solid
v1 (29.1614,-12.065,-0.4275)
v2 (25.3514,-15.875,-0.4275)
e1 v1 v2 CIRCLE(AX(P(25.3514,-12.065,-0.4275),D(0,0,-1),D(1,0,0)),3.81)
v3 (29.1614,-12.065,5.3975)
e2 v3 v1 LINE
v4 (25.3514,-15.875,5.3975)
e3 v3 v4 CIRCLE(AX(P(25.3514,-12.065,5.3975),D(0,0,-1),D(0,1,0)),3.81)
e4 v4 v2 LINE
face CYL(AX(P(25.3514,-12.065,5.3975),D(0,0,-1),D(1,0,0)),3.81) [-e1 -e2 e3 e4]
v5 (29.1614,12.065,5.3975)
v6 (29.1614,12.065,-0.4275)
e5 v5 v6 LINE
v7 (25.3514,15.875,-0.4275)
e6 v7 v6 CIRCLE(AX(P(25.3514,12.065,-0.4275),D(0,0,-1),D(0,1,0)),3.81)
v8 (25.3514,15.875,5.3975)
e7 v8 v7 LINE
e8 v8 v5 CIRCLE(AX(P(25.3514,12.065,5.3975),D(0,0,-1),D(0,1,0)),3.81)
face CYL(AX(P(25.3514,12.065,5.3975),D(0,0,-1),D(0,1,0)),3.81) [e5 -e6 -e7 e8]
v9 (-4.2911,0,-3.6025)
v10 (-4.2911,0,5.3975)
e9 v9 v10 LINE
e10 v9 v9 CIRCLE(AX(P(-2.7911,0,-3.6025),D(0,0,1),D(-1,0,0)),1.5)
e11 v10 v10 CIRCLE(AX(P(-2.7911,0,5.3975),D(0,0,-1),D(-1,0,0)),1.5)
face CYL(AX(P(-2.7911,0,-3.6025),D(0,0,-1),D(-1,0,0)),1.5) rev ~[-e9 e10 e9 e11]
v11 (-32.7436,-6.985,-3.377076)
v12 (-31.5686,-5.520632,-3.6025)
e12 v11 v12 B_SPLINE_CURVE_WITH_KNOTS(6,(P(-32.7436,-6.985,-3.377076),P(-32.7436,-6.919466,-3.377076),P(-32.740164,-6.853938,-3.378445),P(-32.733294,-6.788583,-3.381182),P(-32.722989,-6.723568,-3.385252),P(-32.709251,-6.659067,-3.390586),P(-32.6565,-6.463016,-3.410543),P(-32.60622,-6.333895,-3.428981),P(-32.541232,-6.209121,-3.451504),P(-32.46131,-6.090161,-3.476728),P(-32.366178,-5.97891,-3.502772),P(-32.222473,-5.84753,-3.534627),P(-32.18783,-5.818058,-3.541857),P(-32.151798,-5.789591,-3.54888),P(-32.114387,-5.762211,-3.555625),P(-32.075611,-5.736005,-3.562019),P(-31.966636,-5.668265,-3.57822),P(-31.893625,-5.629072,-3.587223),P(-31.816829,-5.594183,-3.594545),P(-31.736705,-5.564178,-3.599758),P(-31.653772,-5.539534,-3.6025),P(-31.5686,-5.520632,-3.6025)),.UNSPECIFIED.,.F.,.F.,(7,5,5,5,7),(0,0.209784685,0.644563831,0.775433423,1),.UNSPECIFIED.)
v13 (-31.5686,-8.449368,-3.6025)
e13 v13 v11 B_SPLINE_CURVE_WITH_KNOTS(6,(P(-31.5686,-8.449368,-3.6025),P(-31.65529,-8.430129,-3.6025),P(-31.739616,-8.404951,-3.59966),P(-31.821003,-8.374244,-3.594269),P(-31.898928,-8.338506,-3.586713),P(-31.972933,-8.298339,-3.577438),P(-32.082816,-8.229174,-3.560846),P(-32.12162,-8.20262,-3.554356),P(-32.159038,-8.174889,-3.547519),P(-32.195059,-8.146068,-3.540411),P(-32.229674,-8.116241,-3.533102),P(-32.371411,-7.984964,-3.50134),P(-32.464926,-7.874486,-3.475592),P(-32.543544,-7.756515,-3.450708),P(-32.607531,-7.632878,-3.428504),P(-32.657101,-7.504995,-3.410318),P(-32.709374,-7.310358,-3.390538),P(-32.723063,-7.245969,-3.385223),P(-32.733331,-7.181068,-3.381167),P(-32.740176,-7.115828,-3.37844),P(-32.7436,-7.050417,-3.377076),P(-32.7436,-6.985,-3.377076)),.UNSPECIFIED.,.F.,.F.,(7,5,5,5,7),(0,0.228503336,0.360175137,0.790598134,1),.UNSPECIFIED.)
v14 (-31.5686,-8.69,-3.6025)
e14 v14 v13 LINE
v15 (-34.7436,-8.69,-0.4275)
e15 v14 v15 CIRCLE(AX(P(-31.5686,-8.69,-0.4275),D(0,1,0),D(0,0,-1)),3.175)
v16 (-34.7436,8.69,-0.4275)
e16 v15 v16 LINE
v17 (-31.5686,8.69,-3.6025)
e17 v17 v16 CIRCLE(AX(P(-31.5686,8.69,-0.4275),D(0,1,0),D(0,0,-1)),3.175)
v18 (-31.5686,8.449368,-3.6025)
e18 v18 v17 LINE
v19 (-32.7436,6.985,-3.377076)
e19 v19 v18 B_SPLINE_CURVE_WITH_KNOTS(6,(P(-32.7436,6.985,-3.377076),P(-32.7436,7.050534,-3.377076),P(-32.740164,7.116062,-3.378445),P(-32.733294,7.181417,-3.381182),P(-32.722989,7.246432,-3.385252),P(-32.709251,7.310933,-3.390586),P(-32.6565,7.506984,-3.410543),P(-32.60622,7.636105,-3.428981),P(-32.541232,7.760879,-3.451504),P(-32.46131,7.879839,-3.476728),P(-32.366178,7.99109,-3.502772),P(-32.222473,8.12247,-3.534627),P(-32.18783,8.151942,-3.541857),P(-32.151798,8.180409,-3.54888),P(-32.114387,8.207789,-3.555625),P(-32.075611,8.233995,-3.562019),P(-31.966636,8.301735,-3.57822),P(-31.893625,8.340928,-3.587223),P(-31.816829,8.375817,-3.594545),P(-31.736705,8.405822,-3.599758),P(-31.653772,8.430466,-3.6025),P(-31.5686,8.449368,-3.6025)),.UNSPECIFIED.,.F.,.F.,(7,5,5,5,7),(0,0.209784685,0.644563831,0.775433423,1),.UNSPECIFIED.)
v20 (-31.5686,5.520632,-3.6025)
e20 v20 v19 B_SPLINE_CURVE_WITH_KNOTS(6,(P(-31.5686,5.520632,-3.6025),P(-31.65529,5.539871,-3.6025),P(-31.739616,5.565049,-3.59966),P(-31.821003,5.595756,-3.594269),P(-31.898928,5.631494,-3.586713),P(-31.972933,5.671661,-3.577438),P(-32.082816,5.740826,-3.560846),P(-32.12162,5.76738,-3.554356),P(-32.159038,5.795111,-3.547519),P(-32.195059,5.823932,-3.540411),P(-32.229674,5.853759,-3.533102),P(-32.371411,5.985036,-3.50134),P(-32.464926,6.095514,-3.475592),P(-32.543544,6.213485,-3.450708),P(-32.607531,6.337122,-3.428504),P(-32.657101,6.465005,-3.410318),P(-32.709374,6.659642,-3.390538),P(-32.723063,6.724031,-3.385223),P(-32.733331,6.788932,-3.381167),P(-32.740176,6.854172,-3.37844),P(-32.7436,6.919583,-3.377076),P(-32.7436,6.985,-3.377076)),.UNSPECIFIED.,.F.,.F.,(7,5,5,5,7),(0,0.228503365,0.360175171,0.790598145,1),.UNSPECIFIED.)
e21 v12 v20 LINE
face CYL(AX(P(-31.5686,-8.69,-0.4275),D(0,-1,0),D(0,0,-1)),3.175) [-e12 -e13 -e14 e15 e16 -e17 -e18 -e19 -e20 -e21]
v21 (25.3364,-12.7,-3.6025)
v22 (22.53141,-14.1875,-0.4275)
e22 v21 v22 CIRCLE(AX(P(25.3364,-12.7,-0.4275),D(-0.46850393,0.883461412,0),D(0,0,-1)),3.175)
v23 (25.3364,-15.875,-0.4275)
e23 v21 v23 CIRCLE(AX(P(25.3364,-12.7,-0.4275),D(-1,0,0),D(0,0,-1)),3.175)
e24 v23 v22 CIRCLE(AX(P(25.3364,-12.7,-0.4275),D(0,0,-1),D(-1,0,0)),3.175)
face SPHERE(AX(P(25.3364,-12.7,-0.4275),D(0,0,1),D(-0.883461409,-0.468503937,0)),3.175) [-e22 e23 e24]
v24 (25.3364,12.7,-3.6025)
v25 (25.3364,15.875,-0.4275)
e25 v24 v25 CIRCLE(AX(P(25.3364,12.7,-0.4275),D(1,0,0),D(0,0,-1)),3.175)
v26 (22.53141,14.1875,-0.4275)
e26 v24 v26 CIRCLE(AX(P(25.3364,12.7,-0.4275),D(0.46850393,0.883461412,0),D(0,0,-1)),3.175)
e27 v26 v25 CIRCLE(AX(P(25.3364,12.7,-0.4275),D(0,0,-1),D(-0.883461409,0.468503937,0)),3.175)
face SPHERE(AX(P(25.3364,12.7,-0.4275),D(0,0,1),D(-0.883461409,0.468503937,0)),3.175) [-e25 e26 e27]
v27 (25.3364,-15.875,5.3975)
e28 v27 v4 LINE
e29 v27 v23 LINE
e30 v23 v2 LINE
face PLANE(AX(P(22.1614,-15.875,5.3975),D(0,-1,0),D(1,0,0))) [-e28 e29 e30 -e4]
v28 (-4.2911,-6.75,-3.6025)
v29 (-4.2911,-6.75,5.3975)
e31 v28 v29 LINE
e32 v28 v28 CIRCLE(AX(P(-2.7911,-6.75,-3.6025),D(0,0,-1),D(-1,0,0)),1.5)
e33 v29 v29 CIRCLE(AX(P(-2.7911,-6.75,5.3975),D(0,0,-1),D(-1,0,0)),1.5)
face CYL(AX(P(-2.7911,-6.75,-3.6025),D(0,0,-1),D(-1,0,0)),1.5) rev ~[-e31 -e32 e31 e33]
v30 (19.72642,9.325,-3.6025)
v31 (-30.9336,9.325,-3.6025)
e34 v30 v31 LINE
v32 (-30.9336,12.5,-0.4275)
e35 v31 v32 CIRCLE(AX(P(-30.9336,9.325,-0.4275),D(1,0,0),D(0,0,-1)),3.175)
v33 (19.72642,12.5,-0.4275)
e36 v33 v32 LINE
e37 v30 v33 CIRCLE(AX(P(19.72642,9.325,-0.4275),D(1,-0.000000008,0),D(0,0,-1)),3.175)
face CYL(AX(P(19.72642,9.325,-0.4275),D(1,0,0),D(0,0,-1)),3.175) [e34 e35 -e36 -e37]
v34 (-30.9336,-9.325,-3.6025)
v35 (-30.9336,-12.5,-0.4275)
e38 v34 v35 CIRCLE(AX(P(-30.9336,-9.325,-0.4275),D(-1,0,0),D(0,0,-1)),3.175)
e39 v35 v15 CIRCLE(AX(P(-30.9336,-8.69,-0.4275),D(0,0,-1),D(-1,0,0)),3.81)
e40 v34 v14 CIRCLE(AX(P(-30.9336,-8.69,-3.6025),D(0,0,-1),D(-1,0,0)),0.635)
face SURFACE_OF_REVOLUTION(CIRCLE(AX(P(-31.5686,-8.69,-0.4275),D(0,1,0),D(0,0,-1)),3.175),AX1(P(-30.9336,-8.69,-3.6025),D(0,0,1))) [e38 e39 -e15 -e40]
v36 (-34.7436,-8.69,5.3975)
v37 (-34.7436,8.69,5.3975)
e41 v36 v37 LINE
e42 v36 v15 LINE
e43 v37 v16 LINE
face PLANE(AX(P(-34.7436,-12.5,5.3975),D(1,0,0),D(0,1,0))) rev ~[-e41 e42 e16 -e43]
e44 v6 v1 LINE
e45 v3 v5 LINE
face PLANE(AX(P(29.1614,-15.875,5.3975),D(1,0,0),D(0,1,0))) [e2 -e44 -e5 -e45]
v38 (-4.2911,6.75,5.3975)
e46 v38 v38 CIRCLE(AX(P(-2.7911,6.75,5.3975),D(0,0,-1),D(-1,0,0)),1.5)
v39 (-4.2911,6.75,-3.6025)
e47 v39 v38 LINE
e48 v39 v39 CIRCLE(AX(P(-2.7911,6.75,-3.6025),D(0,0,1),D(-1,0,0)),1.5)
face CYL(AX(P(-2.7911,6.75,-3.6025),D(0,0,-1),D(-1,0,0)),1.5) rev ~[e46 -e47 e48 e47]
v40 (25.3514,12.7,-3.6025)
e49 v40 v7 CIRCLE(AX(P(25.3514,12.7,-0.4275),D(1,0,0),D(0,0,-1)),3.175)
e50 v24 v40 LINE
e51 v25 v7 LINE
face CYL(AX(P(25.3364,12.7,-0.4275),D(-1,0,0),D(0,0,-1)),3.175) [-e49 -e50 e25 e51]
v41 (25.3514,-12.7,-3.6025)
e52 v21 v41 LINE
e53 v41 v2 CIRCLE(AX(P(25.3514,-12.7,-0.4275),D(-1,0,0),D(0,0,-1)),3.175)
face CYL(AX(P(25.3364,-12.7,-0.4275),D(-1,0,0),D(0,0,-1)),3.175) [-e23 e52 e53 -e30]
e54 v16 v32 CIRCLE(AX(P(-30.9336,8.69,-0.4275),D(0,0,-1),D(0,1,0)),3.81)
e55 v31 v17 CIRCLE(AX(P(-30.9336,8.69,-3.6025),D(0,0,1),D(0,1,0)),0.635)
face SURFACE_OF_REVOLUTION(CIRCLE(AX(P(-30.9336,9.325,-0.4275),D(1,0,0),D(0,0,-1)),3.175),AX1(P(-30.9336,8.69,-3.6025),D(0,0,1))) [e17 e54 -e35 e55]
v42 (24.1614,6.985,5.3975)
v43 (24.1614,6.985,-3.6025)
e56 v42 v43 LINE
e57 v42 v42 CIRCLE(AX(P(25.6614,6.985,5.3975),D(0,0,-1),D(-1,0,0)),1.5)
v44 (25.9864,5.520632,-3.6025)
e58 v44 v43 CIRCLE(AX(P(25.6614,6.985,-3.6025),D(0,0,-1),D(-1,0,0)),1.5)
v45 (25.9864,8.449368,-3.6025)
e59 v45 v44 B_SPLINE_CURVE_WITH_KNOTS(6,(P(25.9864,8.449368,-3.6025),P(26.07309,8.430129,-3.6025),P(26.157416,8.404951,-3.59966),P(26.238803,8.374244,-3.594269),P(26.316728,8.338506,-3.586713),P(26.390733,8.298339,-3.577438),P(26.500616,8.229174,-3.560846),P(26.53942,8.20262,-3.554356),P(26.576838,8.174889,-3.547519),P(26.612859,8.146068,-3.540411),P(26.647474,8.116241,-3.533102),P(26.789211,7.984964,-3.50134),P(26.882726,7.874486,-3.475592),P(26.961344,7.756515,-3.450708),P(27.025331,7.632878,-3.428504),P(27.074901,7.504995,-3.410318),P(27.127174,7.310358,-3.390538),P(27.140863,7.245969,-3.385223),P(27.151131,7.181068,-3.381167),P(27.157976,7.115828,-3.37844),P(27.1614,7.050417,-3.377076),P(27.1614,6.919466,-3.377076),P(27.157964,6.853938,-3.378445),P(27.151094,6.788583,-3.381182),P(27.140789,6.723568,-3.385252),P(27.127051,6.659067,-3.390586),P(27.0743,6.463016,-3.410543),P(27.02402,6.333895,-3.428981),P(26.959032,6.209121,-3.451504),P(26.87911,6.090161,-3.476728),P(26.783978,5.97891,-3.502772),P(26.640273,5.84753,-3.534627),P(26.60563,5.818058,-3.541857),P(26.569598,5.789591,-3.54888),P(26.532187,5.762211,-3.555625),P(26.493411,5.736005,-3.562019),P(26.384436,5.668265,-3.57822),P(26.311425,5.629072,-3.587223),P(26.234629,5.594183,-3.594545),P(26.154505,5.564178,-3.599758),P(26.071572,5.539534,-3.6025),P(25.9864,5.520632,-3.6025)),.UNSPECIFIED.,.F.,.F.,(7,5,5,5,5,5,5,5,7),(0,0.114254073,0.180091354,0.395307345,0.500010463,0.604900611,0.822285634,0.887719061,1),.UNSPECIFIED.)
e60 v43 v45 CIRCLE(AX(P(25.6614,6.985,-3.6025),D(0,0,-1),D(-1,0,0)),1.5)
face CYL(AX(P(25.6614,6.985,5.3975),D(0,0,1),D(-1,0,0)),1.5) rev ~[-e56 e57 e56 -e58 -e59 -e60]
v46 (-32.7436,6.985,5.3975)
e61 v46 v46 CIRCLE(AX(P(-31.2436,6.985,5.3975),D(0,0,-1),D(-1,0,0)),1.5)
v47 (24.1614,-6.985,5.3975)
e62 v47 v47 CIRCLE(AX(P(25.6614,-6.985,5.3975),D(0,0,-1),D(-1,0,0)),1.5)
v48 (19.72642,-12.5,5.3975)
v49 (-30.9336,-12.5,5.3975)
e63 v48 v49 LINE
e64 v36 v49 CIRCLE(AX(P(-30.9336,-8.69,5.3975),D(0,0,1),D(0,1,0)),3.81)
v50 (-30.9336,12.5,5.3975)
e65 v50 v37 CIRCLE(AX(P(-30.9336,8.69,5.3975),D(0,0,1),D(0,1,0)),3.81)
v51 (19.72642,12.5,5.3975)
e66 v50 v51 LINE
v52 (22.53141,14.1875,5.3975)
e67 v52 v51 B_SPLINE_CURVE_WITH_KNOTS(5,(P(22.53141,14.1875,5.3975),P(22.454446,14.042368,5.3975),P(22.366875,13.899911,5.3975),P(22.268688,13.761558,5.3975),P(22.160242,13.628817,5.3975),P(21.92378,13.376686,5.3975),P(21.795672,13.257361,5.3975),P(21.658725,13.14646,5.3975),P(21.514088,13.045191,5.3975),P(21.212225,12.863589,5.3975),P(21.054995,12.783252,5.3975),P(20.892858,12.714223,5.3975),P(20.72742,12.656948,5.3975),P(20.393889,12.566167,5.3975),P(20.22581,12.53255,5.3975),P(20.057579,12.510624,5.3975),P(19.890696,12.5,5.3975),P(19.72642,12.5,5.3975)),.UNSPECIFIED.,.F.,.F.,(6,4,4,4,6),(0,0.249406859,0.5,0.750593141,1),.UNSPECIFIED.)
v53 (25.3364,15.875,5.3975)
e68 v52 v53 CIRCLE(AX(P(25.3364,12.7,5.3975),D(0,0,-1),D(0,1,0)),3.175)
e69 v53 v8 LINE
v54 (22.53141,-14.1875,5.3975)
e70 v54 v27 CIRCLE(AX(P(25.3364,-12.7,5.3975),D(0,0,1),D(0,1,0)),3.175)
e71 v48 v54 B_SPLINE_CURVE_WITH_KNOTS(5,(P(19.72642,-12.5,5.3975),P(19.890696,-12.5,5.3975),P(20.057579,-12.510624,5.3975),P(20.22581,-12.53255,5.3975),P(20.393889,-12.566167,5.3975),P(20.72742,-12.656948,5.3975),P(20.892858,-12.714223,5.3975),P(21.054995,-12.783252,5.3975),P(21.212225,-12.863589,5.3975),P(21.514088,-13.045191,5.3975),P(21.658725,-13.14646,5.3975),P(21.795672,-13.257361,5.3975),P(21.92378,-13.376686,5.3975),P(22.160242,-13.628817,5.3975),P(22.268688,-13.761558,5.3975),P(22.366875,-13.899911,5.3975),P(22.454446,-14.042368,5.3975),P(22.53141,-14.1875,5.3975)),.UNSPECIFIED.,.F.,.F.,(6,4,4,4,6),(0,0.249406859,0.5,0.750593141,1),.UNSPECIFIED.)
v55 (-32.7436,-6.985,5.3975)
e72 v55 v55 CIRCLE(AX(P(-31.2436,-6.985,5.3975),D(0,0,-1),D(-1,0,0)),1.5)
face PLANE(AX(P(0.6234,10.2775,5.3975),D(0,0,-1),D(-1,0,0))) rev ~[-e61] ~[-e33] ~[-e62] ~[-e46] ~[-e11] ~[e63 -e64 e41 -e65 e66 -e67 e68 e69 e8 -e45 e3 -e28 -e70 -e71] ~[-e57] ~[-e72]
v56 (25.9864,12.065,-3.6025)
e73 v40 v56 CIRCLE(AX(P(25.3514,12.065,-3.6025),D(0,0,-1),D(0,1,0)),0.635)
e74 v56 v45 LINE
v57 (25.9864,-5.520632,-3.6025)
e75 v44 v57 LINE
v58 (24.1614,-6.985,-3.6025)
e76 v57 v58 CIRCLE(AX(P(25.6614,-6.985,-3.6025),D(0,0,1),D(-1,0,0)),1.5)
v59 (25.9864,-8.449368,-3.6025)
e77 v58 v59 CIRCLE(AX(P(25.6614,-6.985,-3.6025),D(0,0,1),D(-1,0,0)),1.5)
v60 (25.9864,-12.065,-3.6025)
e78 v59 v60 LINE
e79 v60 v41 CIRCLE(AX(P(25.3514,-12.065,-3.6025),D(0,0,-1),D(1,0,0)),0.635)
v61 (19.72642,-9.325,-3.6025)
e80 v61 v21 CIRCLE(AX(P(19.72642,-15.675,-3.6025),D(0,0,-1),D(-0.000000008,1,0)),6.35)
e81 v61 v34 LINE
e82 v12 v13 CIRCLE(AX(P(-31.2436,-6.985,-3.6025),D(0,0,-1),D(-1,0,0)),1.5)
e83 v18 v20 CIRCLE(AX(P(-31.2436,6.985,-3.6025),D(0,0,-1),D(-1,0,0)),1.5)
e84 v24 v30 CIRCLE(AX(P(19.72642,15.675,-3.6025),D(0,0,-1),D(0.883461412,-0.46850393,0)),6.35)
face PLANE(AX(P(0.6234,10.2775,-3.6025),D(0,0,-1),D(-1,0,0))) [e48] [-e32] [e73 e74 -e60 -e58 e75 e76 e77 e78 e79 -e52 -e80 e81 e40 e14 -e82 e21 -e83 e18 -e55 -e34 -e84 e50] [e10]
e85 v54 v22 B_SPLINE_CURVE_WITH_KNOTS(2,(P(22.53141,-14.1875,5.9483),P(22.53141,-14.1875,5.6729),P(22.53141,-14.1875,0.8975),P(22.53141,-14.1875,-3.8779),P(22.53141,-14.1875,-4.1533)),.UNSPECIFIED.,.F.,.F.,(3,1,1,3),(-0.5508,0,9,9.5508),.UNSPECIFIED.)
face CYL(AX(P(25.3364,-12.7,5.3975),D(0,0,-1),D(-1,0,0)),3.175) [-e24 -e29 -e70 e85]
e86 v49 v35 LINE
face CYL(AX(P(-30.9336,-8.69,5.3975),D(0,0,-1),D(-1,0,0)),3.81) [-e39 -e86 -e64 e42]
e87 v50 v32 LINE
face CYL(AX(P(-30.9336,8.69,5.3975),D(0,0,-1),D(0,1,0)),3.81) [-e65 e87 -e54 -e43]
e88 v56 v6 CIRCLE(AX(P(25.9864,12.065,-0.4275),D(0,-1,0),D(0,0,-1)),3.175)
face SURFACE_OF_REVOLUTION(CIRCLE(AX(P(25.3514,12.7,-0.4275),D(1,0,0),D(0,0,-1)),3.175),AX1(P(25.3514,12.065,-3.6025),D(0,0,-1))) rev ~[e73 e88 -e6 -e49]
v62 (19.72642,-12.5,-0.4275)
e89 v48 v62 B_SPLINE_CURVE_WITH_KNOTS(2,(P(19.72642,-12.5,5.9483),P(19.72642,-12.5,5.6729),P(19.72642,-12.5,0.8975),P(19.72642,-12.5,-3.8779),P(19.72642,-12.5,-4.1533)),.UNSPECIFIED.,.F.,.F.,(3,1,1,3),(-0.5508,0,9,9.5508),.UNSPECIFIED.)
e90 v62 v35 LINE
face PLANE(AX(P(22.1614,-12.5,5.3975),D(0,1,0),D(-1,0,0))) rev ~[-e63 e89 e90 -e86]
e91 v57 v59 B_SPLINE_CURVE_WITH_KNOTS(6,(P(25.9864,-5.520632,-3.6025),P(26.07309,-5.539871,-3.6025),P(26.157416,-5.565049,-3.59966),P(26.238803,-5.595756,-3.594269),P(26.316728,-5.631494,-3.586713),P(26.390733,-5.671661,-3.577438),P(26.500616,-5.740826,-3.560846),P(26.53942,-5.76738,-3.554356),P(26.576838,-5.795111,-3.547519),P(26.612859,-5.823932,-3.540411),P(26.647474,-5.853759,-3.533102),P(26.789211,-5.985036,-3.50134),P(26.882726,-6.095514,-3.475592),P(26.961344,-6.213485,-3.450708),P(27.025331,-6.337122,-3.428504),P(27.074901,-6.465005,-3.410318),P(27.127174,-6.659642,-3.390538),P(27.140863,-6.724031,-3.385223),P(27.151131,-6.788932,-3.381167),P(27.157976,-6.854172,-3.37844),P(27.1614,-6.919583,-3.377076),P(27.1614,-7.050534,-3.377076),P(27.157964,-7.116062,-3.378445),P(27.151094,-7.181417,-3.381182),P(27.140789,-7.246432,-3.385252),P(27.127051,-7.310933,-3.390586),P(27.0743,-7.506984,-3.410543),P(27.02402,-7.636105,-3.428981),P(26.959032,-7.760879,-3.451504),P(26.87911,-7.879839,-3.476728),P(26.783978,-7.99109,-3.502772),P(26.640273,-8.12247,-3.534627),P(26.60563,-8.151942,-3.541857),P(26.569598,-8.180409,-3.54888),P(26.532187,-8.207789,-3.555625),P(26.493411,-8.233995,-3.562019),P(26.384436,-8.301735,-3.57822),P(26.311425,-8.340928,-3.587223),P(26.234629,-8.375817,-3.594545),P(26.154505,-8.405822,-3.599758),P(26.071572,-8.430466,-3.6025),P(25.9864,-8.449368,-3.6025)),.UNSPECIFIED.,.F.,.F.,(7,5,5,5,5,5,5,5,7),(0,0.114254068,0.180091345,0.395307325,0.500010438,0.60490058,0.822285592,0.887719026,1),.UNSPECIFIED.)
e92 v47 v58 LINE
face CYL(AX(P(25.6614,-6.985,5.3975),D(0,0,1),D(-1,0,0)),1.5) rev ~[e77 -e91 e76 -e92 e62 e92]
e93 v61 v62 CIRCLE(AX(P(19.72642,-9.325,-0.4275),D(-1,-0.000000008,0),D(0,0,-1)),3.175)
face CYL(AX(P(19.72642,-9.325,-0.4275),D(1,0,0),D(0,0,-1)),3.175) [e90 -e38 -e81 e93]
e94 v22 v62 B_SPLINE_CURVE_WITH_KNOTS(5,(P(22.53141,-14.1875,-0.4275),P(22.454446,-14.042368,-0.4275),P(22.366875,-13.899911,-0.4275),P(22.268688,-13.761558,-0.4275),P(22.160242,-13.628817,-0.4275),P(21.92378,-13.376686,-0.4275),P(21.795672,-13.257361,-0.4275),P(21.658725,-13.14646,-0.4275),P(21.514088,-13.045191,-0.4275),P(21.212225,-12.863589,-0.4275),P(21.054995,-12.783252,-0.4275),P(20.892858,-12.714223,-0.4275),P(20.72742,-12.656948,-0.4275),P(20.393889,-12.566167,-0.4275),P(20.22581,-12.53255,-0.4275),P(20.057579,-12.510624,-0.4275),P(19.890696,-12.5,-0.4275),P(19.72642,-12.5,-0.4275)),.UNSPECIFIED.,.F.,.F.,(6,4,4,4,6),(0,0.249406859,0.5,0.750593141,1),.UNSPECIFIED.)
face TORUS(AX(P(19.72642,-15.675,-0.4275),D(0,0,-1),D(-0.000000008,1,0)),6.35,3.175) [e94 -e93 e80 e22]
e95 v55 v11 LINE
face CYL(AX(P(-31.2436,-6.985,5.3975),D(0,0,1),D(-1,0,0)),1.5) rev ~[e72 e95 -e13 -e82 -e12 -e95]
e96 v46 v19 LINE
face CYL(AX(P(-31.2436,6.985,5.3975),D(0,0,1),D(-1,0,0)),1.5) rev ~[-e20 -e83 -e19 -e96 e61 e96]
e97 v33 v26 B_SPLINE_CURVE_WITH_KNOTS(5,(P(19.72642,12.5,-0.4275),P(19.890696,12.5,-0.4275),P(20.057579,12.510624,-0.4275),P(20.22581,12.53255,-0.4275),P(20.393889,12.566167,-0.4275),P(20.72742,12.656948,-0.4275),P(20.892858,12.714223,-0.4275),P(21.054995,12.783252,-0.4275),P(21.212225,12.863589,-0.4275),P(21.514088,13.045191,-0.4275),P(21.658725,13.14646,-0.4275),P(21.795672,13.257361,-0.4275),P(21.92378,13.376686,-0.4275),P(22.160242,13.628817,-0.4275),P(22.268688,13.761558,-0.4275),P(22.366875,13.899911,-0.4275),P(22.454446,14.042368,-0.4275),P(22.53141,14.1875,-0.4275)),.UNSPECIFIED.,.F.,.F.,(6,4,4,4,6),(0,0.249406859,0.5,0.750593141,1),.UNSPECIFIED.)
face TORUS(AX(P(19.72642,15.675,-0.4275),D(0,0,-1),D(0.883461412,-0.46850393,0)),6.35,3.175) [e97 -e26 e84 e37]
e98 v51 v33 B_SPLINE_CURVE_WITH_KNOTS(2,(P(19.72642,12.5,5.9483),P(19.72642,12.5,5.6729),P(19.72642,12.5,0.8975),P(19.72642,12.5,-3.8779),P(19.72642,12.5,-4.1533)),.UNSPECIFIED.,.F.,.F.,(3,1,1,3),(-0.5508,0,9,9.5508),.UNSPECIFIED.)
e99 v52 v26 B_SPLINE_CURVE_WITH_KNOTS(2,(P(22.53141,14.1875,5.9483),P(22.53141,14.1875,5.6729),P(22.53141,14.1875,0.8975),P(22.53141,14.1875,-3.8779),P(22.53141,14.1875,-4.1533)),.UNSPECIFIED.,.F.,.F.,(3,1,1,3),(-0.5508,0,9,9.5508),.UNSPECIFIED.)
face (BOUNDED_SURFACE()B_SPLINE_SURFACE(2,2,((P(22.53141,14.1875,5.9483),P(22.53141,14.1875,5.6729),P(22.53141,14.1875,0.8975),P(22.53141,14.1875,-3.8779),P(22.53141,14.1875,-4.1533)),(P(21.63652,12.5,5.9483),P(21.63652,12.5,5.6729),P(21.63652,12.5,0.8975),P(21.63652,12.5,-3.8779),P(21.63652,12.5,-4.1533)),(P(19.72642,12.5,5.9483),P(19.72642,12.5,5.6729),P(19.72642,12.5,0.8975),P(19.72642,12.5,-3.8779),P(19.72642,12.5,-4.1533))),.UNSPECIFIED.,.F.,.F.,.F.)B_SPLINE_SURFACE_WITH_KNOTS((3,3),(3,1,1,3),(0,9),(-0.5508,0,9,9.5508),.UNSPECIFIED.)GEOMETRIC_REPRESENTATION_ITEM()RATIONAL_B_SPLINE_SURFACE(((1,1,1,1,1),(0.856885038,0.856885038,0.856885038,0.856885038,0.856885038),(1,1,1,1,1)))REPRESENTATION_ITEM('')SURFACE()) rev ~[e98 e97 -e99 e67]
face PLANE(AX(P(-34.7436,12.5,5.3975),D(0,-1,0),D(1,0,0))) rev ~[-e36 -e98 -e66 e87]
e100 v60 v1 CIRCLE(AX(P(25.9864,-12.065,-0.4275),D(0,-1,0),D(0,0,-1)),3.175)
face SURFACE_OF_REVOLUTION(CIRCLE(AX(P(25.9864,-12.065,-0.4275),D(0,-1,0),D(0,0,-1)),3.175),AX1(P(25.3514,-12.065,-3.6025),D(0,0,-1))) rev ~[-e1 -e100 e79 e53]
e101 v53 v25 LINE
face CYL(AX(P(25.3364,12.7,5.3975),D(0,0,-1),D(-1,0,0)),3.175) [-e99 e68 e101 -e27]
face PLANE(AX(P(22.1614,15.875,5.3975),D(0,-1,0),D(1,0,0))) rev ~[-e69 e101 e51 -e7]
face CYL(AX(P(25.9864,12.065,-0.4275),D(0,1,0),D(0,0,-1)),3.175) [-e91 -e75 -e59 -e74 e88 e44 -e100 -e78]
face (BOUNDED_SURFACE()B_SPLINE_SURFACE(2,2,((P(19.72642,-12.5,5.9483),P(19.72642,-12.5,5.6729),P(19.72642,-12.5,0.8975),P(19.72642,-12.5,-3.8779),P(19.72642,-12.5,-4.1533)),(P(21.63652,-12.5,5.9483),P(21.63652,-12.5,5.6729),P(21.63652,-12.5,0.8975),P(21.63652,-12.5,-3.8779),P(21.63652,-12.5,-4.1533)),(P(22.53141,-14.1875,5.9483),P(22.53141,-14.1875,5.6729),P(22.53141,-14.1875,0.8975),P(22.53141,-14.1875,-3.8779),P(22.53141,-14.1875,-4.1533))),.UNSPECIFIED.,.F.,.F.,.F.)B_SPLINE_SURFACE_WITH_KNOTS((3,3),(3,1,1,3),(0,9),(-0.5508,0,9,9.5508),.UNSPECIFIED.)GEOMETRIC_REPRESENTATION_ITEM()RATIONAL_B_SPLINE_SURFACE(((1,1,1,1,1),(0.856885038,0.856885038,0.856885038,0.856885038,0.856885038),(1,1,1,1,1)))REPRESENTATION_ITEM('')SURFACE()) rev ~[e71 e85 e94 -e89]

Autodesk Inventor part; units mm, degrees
ref_plane "YZ Plane" through (0, 0, 0) normal (1, 0, 0) x (0, 1, 0)
ref_plane "XZ Plane" through (0, 0, 0) normal (0, 1, 0) x (-1, 0, 0)
ref_plane "XY Plane" through (0, 0, 0) normal (0, 0, 1) x (1, 0, 0)
sketch "Sketch1" plane through (0, 0, 0) normal (0, 0, 1) x (1, 0, 0)
  circle A0 centre (-10.2325, -6.35) radius 2
  circle A1 centre (-10.2325, 6.35) radius 2
  circle A2 centre (10.0875, 6.35) radius 2
  circle A3 centre (10.0875, -6.35) radius 2
  line L0 (-15.3125, 10.2775) -> (10.2325, 10.2775)
  line L1 (10.2325, 10.2775) -> (15.3125, 10.2775)
  line L2 (15.3125, 10.2775) -> (15.3125, -10.2775)
  line L3 (-15.3125, 10.2775) -> (-15.3125, -10.2775)
  line L4 (-15.3125, -10.2775) -> (15.3125, -10.2775)
  line L5 (0, -10.2775) -> (0, 10.2775)
  line L6 (-15.3125, 0) -> (0, 0)
  point P0 (0, 0)
  dimension "d1" = 5.08
extrude "Extrusion1" add sketch "Sketch1" along normal blind 3.81 contours A0 | A1 | A2 | A3 | L0 L5 L6 L3 | L0 L1 L2 L4 L5 | L6 L5 L4 L3
sketch "Sketch2" plane through (0, 0, 3.81) normal (0, 0, 1) x (1, 0, 0)
  line L0 (-15.3125, -10.2775) -> (15.3125, -10.2775) projected
  line L1 (15.3125, -10.2775) -> (15.3125, 10.2775) projected
  line L2 (15.3125, 10.2775) -> (-15.3125, 10.2775) projected
  line L3 (-15.3125, 10.2775) -> (-15.3125, -10.2775) projected
  point P0 (0, 0)
extrude "Extrusion2" add sketch "Sketch2" along normal blind 1.5875
sketch "Sketch3" plane through (0, 0, 5.3975) normal (0, 0, 1) x (1, 0, 0)
  circle A0 centre (-10.2325, -6.35) radius 2 projected
  circle A1 centre (10.0875, -6.35) radius 2 projected
  circle A2 centre (10.0875, 6.35) radius 2 projected
  circle A3 centre (-10.2325, 6.35) radius 2 projected
  line L0 (-15.3125, -10.2775) -> (15.3125, -10.2775) projected
  line L1 (10.0875, -10.2775) -> (10.0875, 10.2775)
  line L2 (15.3125, 10.2775) -> (-15.3125, 10.2775) projected
  line L3 (-10.2325, -10.2775) -> (-10.2325, 10.2775)
  line L4 (-10.2325, 10.2775) -> (10.0875, 10.2775)
  line L5 (10.0875, -10.2775) -> (-10.2325, -10.2775)
  line L6 (15.3125, -10.2775) -> (15.3125, 10.2775) projected
  point P0 (0, 0)
extrude "Extrusion3" add sketch "Sketch3" along normal blind 8.9916 contours A0 L3 | A0 L3 A3 L2 L1 A2 A1 L0 | L3 A3 | A1 L1 | L1 A2 picked at (-9.5825, -6.2017) picked at (-9.5825, 6.4983) picked at (9.4642, -6.5864) picked at (9.4642, 6.1136)
sketch "Sketch4" plane through (-10.2325, -10.2775, 5.3975) normal (-1, 0, 0) x (0, 0, 1)
  line L0 (8.9916, 20.555) -> (8.9916, 0) projected
  line L1 (8.9916, 10.2775) -> (0, 10.2775)
  line L2 (0, 0) -> (0, 20.555) projected
  line L3 (4.4958, 10.2775) -> (4.4958, 5.7817)
  line L4 (4.4958, 10.2775) -> (4.4958, 14.7733)
  circle A0 centre (4.4958, 5.7817) radius 2
  circle A1 centre (4.4958, 14.7733) radius 2
  point P0 (-5.3975, 10.2775)
  dimension "d8" = 4.4958
  dimension "d9" = 4.4958
  dimension "d10" = 4
  dimension "d11" = 4
extrude "Extrusion4" cut sketch "Sketch4" against normal through all
sketch "Sketch7" plane through (10.0875, -10.2775, 5.3975) normal (1, 0, 0) x (0, 0, -1)
  line L0 (0, 20.555) -> (0, 0) projected
  line L1 (0, 20.555) -> (-8.9916, 20.555) projected
  line L2 (-8.9916, 0) -> (-8.9916, 20.555) projected
  line L3 (0, 0) -> (-8.9916, 0) projected
  point P0 (5.3975, 10.2775)
extrude "Extrusion7" cut sketch "Sketch7" against normal blind 6.289
fillet "Fillet5" radius 3.175 8 edges at (-15.3125, 10.2775, 2.6987) (-15.3125, -10.2775, 2.6987) (15.3125, 10.2775, 2.6987) (15.3125, -10.2775, 2.6987) (3.7984, 10.2775, 9.8933) (-10.2325, 10.2775, 9.8933) (3.7984, -10.2775, 9.8933) (-10.2325, -10.2775, 9.8933)
sketch "Sketch9" plane through (0, 0, 0) normal (0, 0, -1) x (-1, 0, 0)
  line L0 (-34.8064, -15.875) -> (-34.8064, 15.875)
  line L1 (-27.8064, -15.875) -> (-34.8064, -15.875)
  line L2 (-27.8064, -12.5) -> (-27.8064, -15.875)
  line L3 (-27.8064, 12.5) -> (-27.8064, -12.5)
  line L4 (-27.8064, 15.875) -> (-27.8064, 12.5)
  line L5 (-34.8064, 15.875) -> (-27.8064, 15.875)
  line L6 (-27.8064, 12.5) -> (-27.8064, -12.5)
  line L7 (-27.8064, -12.5) -> (27.1936, -12.5)
  line L8 (27.1936, 12.5) -> (27.1936, -12.5)
  line L9 (27.1936, 12.5) -> (-27.8064, 12.5)
  line L10 (-34.8064, 0) -> (-27.8064, 0)
  line L11 (-31.3064, 0) -> (-31.3064, -6.985)
  line L12 (-31.3064, 0) -> (-31.3064, 6.985)
  circle A0 centre (-31.3064, -6.985) radius 1.5
  circle A1 centre (-31.3064, 6.985) radius 1.5
  circle A2 centre (23.6936, -6.985) radius 1.5
  circle A3 centre (23.6936, 6.985) radius 1.5
  line L13 (-34.8064, 0) -> (27.1936, 0)
  line L14 (0, 0) -> (0, 12.5)
  point P0 (0, 0)
  point P1 (-34.8064, 0)
  point P2 (-34.8064, 0)
  dimension "d26" = 6.985
  dimension "d27" = 6.985
  dimension "d28" = 3
  dimension "d29" = 3
extrude "Extrusion9" cut sketch "Sketch9" against normal up to surface (5.3975 mm away) contours L3 L13 L8 L7 | L3 L9 L14 L13 | L14 L9 L8 L13
sketch "Sketch10" plane through (0.6234, 10.2775, 5.3975) normal (0, 0, -1) x (-1, 0, 0)
  line L0 (10.856, -12.7733) -> (10.856, -16.7733) projected
  line L1 (10.856, -3.7817) -> (10.856, -7.7817) projected
  arc A0 (0, 0) -> (-3.175, -3.175) centre (0, -3.175) ccw projected
  arc A1 (0, 0) -> (-3.175, -3.175) centre (0, -3.175) ccw projected
  arc A2 (0, 0) -> (-3.175, -3.175) centre (0, -3.175) ccw projected
  arc A3 (0, 0) -> (-3.175, -3.175) centre (0, -3.175) ccw projected
  arc A4 (10.856, -3.175) -> (7.681, 0) centre (7.681, -3.175) ccw projected
  arc A5 (10.856, -3.175) -> (7.681, 0) centre (7.681, -3.175) ccw projected
  arc A6 (10.856, -3.175) -> (7.681, 0) centre (7.681, -3.175) ccw projected
  line L2 (-3.175, -3.7817) -> (-3.175, -7.7817) projected
  line L3 (-3.175, -3.7817) -> (-3.175, -7.7817) projected
  line L4 (10.856, -3.7817) -> (10.856, -7.7817) projected
  line L5 (-3.175, -12.7733) -> (-3.175, -16.7733) projected
  line L6 (-3.175, -17.38) -> (-3.175, -3.175) projected
  line L7 (-3.175, -3.175) -> (-3.175, -17.38) projected
  line L8 (-3.175, -17.38) -> (-3.175, -3.175) projected
  line L9 (-3.175, -3.7817) -> (-3.175, -7.7817) projected
  line L10 (-3.175, -12.7733) -> (-3.175, -16.7733) projected
  line L11 (-3.175, -3.175) -> (-3.175, -17.38) projected
  line L12 (10.856, -3.175) -> (10.856, -17.38) projected
  line L13 (10.856, -17.38) -> (10.856, -3.175) projected
  line L14 (10.856, -3.175) -> (10.856, -17.38) projected
  line L15 (10.856, -17.38) -> (10.856, -3.175) projected
  line L16 (10.856, -3.7817) -> (10.856, -7.7817) projected
  line L17 (10.856, -12.7733) -> (10.856, -16.7733) projected
  line L18 (-3.175, -12.7733) -> (-3.175, -16.7733) projected
  line L19 (10.856, -12.7733) -> (10.856, -16.7733) projected
  line L20 (7.681, -20.555) -> (0, -20.555) projected
  line L21 (7.681, -20.555) -> (0, -20.555) projected
  line L22 (7.681, -20.555) -> (0, -20.555) projected
  line L23 (7.681, -20.555) -> (0, -20.555) projected
  arc A7 (-3.175, -17.38) -> (0, -20.555) centre (0, -17.38) ccw projected
  arc A8 (-3.175, -17.38) -> (0, -20.555) centre (0, -17.38) ccw projected
  arc A9 (-3.175, -17.38) -> (0, -20.555) centre (0, -17.38) ccw projected
  arc A10 (7.681, -20.555) -> (10.856, -17.38) centre (7.681, -17.38) ccw projected
  arc A11 (7.681, -20.555) -> (10.856, -17.38) centre (7.681, -17.38) ccw projected
  line L24 (0, 0) -> (7.681, 0) projected
  arc A12 (0, 0) -> (-3.175, -3.175) centre (0, -3.175) ccw projected
  line L25 (-3.175, -3.175) -> (-3.175, -17.38) projected
  arc A13 (-3.175, -17.38) -> (0, -20.555) centre (0, -17.38) ccw projected
  line L26 (7.681, -20.555) -> (0, -20.555) projected
  arc A14 (7.681, -20.555) -> (10.856, -17.38) centre (7.681, -17.38) ccw projected
  line L27 (10.856, -17.38) -> (10.856, -3.175) projected
  arc A15 (10.856, -3.175) -> (7.681, 0) centre (7.681, -3.175) ccw projected
  arc A16 (-3.175, -17.38) -> (0, -20.555) centre (0, -17.38) ccw projected
  arc A17 (7.681, -20.555) -> (10.856, -17.38) centre (7.681, -17.38) ccw projected
  arc A18 (7.681, -20.555) -> (10.856, -17.38) centre (7.681, -17.38) ccw projected
  line L28 (7.681, -20.555) -> (0, -20.555) projected
  arc A19 (-3.175, -17.38) -> (0, -20.555) centre (0, -17.38) ccw projected
  line L29 (-3.175, -17.38) -> (-3.175, -3.175) projected
  arc A20 (0, 0) -> (-3.175, -3.175) centre (0, -3.175) ccw projected
  line L30 (0, 0) -> (7.681, 0) projected
  arc A21 (10.856, -3.175) -> (7.681, 0) centre (7.681, -3.175) ccw projected
  line L31 (10.856, -3.175) -> (10.856, -17.38) projected
  line L32 (0, 0) -> (7.681, 0) projected
  line L33 (0, 0) -> (7.681, 0) projected
  line L34 (0, 0) -> (7.681, 0) projected
  line L35 (0, 0) -> (7.681, 0) projected
  arc A22 (10.856, -3.175) -> (7.681, 0) centre (7.681, -3.175) ccw projected
  arc A23 (7.681, -20.555) -> (10.856, -17.38) centre (7.681, -17.38) ccw projected
  line L36 (0.6234, -10.2775) -> (0.6234, 2.2225) projected
  line L37 (0.6234, -10.2775) -> (-1.4597, -6.785)
  line L38 (8.1734, -10.2775) -> (-23.133, -10.2775)
  line L39 (-21.538, 5.5975) -> (-21.538, -26.1525)
  line L40 (-21.538, -26.1525) -> (-28.538, -26.1525)
  line L41 (-28.538, -26.1525) -> (-28.538, 5.5975)
  line L42 (-21.538, 5.5975) -> (-28.538, 5.5975)
  circle A24 centre (-25.038, -3.2925) radius 1.5
  circle A25 centre (-25.038, -17.2625) radius 1.5
  line L43 (-25.038, -10.2775) -> (-25.038, -17.2625)
  line L44 (-23.133, -10.2775) -> (-25.038, -10.2775)
  line L45 (-27.133, -22.7775) -> (-29.038, -22.7775)
  line L46 (-27.133, 2.2225) -> (-29.038, 2.2225)
  line L47 (0.6234, -10.2775) -> (2.7066, -13.77)
  line L48 (-21.538, -22.7775) -> (35.367, -22.7775)
  line L49 (35.367, -22.7775) -> (35.367, 2.2225)
  line L50 (35.367, 2.2225) -> (-21.538, 2.2225)
  circle A26 centre (31.867, -17.2625) radius 1.5
  circle A27 centre (31.867, -3.2925) radius 1.5
  line L51 (0.6234, -10.2775) -> (8.1734, -10.2775)
  point P0 (0.6234, -10.2775)
  point P1 (0.6234, -10.2775)
  point P2 (0, 0)
  dimension "d47" = 1.905
  dimension "d48" = 7.55
extrude "Extrusion10" add sketch "Sketch10" along normal blind 9
fillet "Fillet17" radius 3.81 4 edges at (29.1614, -15.875, 0.8975) (-34.7436, -12.5, 0.8975) (-34.7436, 12.5, 0.8975) (29.1614, 15.875, 0.8975)
fillet "Fillet18" radius 3.175 2 edges at (22.1614, -15.875, 0.8975) (22.1614, 15.875, 0.8975)
fillet "Fillet19" radius 3.175 2 edges at (22.1614, -12.5, 0.8975) (22.1614, 12.5, 0.8975)
sketch "Sketch11" plane through (0, 0, 14.3891) normal (0, 0, 1) x (1, 0, 0)
  arc A0 (-10.2325, -7.1025) -> (-7.0575, -10.2775) centre (-7.0575, -7.1025) ccw projected
  line L0 (-7.0575, -10.2775) -> (0.6234, -10.2775) projected
  arc A1 (0.6234, -10.2775) -> (3.7984, -7.1025) centre (0.6234, -7.1025) ccw projected
  line L1 (3.7984, -7.1025) -> (3.7984, 7.1025) projected
  arc A2 (3.7984, 7.1025) -> (0.6234, 10.2775) centre (0.6234, 7.1025) ccw projected
  line L2 (0.6234, 10.2775) -> (-7.0575, 10.2775) projected
  arc A3 (-7.0575, 10.2775) -> (-10.2325, 7.1025) centre (-7.0575, 7.1025) ccw projected
  line L3 (-10.2325, 7.1025) -> (-10.2325, -7.1025) projected
  arc A4 (-82.2091, -59.7824) -> (-79.0341, -62.9574) centre (-79.0341, -59.7824) ccw
  line L4 (-79.0341, -62.9574) -> (-71.3531, -62.9574)
  arc A5 (-71.3531, -62.9574) -> (-68.1781, -59.7824) centre (-71.3531, -59.7824) ccw
  line L5 (-68.1781, -59.7824) -> (-68.1781, -45.5774)
  arc A6 (-68.1781, -45.5774) -> (-71.3531, -42.4024) centre (-71.3531, -45.5774) ccw
  line L6 (-71.3531, -42.4024) -> (-79.0341, -42.4024)
  arc A7 (-79.0341, -42.4024) -> (-82.2091, -45.5774) centre (-79.0341, -45.5774) ccw
  line L7 (-82.2091, -45.5774) -> (-82.2091, -59.7824)
  point P0 (-71.9766, -52.6799)
extrude "Extrusion11" cut sketch "Sketch11" against normal up to surface (8.9916 mm away) contours L3 A3 L2 A2 L1 A1 L0 A0
fillet "Fillet23" radius 3.175 14 edges at (21.3632, 12.9544, -3.6025) (23.6997, 15.4206, -3.6025) (25.3439, 15.875, -3.6025) (28.0455, 14.7591, -3.6025) (29.1614, 0, -3.6025) (28.0455, -14.7591, -3.6025) (25.3439, -15.875, -3.6025) (23.6997, -15.4206, -3.6025) (21.3632, -12.9544, -3.6025) (-5.6036, -12.5, -3.6025) (-33.6277, -11.3841, -3.6025) (-34.7436, 0, -3.6025) (-33.6277, 11.3841, -3.6025) (-5.6036, 12.5, -3.6025)
sketch "Sketch14" plane through (0.6234, 10.2775, -3.6025) normal (0, 0, -1) x (-1, 0, 0)
  circle A0 centre (3.4145, -17.0275) radius 1.5
  circle A1 centre (3.4145, -10.2775) radius 1.5
  circle A2 centre (3.4145, -3.5275) radius 1.5
  line L0 (-28.538, 1.7875) -> (-28.538, -22.3425) projected
  line L1 (-28.538, -10.2775) -> (35.367, -10.2775)
  line L2 (35.367, -18.9675) -> (35.367, -1.5875) projected
  line L3 (3.4145, -10.2775) -> (3.4145, 9.7711)
  point P0 (0.6234, -10.2775)
extrude "Extrusion14" cut sketch "Sketch14" against normal blind 25.4
properties part number "connecting plate servo flat v5"
